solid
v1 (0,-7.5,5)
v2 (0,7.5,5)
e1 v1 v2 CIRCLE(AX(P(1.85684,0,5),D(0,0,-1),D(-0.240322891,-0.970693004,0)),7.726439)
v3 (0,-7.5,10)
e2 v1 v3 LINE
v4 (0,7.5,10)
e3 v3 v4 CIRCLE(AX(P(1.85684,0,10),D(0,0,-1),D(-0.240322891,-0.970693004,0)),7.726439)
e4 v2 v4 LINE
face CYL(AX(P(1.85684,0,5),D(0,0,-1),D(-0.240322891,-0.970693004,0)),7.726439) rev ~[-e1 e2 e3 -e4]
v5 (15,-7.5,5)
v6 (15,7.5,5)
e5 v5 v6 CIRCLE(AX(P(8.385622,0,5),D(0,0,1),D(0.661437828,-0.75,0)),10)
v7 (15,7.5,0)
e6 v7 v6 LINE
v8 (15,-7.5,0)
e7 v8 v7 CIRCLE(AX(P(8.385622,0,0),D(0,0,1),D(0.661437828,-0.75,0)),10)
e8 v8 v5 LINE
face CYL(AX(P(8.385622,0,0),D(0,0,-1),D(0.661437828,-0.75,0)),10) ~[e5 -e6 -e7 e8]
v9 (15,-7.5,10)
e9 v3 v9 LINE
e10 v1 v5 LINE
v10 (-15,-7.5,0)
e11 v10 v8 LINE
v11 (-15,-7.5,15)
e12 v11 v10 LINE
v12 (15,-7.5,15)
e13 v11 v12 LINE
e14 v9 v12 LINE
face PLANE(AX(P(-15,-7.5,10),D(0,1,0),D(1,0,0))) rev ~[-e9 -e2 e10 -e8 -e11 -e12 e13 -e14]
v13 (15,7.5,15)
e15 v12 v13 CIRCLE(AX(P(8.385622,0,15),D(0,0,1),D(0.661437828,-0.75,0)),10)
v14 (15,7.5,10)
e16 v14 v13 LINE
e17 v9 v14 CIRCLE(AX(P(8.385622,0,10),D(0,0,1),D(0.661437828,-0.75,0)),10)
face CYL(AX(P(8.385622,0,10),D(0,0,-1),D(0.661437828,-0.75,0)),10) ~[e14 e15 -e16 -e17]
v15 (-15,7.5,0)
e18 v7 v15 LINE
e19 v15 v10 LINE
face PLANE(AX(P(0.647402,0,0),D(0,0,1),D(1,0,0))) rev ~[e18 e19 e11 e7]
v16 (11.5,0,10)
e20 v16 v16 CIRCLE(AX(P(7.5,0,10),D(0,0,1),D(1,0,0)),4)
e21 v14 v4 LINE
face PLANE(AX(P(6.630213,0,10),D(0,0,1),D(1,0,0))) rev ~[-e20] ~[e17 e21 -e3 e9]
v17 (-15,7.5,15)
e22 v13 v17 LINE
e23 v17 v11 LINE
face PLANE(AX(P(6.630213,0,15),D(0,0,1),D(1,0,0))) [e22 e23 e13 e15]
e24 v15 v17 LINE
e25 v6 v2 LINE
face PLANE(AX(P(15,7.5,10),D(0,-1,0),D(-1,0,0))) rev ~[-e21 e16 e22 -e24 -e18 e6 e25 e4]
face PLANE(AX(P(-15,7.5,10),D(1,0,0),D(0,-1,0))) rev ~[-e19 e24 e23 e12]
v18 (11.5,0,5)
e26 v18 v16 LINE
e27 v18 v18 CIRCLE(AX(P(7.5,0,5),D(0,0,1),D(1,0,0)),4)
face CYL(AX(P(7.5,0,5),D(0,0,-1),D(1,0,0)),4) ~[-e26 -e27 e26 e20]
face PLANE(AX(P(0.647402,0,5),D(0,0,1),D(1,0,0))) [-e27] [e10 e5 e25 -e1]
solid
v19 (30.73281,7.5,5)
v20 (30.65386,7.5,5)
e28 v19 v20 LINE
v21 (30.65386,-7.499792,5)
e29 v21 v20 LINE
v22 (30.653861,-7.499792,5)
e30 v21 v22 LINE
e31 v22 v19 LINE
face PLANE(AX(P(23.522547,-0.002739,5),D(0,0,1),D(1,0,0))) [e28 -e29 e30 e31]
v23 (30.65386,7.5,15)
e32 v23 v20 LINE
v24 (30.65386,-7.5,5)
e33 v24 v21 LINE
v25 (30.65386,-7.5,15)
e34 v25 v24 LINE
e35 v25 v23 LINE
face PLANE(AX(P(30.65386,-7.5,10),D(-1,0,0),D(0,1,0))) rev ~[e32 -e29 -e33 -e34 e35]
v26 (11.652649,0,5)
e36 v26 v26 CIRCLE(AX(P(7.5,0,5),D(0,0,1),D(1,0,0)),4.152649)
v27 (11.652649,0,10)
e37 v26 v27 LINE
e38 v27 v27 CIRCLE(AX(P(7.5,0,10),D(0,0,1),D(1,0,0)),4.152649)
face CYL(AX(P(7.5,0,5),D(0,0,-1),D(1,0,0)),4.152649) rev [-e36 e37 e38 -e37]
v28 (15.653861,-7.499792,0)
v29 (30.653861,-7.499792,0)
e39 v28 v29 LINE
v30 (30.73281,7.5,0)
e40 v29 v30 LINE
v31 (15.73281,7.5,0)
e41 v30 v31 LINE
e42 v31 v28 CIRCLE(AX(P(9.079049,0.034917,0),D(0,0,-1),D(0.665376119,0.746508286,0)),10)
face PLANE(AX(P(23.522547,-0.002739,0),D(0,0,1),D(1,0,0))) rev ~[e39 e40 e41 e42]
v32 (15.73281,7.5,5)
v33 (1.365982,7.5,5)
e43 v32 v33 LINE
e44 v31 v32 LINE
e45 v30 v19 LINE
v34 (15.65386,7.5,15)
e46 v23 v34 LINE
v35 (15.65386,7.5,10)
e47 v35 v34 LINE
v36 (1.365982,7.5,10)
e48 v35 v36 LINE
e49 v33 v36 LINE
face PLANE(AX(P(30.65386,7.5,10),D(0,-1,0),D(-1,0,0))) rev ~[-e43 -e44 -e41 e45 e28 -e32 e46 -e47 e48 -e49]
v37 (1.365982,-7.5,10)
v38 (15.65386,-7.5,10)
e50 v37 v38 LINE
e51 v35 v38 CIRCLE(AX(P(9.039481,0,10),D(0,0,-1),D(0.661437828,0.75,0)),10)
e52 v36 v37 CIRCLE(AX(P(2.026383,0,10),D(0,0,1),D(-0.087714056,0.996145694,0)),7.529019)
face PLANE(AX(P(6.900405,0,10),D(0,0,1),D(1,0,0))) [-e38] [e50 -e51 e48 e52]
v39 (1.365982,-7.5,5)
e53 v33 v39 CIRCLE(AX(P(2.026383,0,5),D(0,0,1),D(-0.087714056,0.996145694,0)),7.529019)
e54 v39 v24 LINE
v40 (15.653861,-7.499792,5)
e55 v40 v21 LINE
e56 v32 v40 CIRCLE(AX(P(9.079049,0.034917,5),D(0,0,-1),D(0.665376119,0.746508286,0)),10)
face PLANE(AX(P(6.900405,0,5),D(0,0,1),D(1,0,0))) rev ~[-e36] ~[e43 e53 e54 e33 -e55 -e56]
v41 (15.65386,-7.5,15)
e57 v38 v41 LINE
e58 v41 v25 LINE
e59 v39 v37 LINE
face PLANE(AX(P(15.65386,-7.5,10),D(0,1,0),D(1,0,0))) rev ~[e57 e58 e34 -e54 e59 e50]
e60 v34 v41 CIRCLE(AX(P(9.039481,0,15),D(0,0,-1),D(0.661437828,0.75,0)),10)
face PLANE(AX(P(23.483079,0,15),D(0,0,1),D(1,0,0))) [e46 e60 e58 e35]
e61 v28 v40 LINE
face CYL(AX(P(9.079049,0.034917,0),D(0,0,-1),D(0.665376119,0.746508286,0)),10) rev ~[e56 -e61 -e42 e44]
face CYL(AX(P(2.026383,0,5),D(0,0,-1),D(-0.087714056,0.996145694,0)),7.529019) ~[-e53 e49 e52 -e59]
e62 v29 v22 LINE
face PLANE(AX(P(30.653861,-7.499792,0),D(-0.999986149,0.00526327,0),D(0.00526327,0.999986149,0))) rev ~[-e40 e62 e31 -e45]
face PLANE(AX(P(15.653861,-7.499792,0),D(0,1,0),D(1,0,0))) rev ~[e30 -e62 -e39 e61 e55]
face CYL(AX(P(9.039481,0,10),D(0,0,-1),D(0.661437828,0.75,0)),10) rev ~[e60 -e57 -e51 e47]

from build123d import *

# Parameters (mm, degrees)
F1_DEPTH = 5
F2_R     = 4
F3_DEPTH = 5
F2_R_2   = 4.1526486357
F4_DEPTH = 5
F6_DEPTH = 5
F7_DEPTH = 5


with BuildPart() as f1:
    # F0 (on Top) → F1 (new body)
    with BuildSketch(Plane.XY):
        with BuildLine():
            Line((15, 7.5), (-15, 7.5))
            Line((-15, 7.5), (-15, -7.5))
            Line((-15, -7.5), (15, -7.5))
            ThreePointArc((15, -7.5), (18.3856217223, 0), (15, 7.5))
        make_face()
    extrude(amount=F1_DEPTH)

    # F2 (on face) → F3 (join)
    with BuildSketch(Plane.XY.offset(5)):
        with BuildLine():
            Line((0, 7.5), (-15, 7.5))
            Line((-15, 7.5), (-15, -7.5))
            Line((-15, -7.5), (0, -7.5))
            ThreePointArc((0, -7.5), (-5.8695986214, 0), (0, 7.5))
        make_face()
        with Locations((7.5, 0)):
            Circle(F2_R)
    extrude(amount=F3_DEPTH)

    # F5 (on face) → F7 (join)
    with BuildSketch(Plane.XY.offset(10)):
        with BuildLine():
            ThreePointArc((15, -7.5), (18.3856217223, 0), (15, 7.5))
            Line((15, 7.5), (0, 7.5))
            ThreePointArc((0, 7.5), (-5.8695986214, 0), (0, -7.5))
            Line((0, -7.5), (15, -7.5))
        make_face()
        with BuildLine():
            ThreePointArc((0, -7.5), (-5.8695986214, 0), (0, 7.5))
            Line((0, 7.5), (-15, 7.5))
            Line((-15, 7.5), (-15, -7.5))
            Line((-15, -7.5), (0, -7.5))
        make_face()
    extrude(amount=F7_DEPTH)


with BuildPart() as f1b:
    # F0 (on Top) → F1, piece 2 (new body)
    with BuildSketch(Plane.XY):
        with BuildLine():
            Line((30.7328099012, 7.5), (15.7328099012, 7.5))
            ThreePointArc((15.7328099012, 7.5), (19.078910202, -0.0177155588), (15.6538608473, -7.4997922335))
            Line((15.6538608473, -7.4997922335), (30.6538608473, -7.4997922335))
            Line((30.6538608473, -7.4997922335), (30.7328099012, 7.5))
        make_face()
    extrude(amount=F1_DEPTH)

    # F2 (on face) → F4 (join)
    with BuildSketch(Plane.XY.offset(5)):
        with BuildLine():
            Line((15, 7.5), (1.3659824617, 7.5))
            ThreePointArc((1.3659824617, 7.5), (-5.5026358727, 0), (1.3659824617, -7.5))
            Line((1.3659824617, -7.5), (15, -7.5))
            ThreePointArc((15, -7.5), (18.3856217223, 0), (15, 7.5))
        make_face()
        with Locations((7.5, 0)):
            Circle(F2_R_2, mode=Mode.SUBTRACT)
        with BuildLine():
            Line((30.6538597538, 7.5), (15, 7.5))
            ThreePointArc((15, 7.5), (18.3856217223, 0), (15, -7.5))
            Line((15, -7.5), (30.6538597538, -7.5))
            Line((30.6538597538, -7.5), (30.6538597538, 7.5))
        make_face()
    extrude(amount=F4_DEPTH)

    # F5 (on face) → F6 (join)
    with BuildSketch(Plane.XY.offset(10)):
        with BuildLine():
            Line((30.6538597538, 7.5), (15.6538597538, 7.5))
            ThreePointArc((15.6538597538, 7.5), (19.0394814761, 0), (15.6538597538, -7.5))
            Line((15.6538597538, -7.5), (30.6538597538, -7.5))
            Line((30.6538597538, -7.5), (30.6538597538, 7.5))
        make_face()
    extrude(amount=F6_DEPTH)


solid = Compound([f1.part, f1b.part])
